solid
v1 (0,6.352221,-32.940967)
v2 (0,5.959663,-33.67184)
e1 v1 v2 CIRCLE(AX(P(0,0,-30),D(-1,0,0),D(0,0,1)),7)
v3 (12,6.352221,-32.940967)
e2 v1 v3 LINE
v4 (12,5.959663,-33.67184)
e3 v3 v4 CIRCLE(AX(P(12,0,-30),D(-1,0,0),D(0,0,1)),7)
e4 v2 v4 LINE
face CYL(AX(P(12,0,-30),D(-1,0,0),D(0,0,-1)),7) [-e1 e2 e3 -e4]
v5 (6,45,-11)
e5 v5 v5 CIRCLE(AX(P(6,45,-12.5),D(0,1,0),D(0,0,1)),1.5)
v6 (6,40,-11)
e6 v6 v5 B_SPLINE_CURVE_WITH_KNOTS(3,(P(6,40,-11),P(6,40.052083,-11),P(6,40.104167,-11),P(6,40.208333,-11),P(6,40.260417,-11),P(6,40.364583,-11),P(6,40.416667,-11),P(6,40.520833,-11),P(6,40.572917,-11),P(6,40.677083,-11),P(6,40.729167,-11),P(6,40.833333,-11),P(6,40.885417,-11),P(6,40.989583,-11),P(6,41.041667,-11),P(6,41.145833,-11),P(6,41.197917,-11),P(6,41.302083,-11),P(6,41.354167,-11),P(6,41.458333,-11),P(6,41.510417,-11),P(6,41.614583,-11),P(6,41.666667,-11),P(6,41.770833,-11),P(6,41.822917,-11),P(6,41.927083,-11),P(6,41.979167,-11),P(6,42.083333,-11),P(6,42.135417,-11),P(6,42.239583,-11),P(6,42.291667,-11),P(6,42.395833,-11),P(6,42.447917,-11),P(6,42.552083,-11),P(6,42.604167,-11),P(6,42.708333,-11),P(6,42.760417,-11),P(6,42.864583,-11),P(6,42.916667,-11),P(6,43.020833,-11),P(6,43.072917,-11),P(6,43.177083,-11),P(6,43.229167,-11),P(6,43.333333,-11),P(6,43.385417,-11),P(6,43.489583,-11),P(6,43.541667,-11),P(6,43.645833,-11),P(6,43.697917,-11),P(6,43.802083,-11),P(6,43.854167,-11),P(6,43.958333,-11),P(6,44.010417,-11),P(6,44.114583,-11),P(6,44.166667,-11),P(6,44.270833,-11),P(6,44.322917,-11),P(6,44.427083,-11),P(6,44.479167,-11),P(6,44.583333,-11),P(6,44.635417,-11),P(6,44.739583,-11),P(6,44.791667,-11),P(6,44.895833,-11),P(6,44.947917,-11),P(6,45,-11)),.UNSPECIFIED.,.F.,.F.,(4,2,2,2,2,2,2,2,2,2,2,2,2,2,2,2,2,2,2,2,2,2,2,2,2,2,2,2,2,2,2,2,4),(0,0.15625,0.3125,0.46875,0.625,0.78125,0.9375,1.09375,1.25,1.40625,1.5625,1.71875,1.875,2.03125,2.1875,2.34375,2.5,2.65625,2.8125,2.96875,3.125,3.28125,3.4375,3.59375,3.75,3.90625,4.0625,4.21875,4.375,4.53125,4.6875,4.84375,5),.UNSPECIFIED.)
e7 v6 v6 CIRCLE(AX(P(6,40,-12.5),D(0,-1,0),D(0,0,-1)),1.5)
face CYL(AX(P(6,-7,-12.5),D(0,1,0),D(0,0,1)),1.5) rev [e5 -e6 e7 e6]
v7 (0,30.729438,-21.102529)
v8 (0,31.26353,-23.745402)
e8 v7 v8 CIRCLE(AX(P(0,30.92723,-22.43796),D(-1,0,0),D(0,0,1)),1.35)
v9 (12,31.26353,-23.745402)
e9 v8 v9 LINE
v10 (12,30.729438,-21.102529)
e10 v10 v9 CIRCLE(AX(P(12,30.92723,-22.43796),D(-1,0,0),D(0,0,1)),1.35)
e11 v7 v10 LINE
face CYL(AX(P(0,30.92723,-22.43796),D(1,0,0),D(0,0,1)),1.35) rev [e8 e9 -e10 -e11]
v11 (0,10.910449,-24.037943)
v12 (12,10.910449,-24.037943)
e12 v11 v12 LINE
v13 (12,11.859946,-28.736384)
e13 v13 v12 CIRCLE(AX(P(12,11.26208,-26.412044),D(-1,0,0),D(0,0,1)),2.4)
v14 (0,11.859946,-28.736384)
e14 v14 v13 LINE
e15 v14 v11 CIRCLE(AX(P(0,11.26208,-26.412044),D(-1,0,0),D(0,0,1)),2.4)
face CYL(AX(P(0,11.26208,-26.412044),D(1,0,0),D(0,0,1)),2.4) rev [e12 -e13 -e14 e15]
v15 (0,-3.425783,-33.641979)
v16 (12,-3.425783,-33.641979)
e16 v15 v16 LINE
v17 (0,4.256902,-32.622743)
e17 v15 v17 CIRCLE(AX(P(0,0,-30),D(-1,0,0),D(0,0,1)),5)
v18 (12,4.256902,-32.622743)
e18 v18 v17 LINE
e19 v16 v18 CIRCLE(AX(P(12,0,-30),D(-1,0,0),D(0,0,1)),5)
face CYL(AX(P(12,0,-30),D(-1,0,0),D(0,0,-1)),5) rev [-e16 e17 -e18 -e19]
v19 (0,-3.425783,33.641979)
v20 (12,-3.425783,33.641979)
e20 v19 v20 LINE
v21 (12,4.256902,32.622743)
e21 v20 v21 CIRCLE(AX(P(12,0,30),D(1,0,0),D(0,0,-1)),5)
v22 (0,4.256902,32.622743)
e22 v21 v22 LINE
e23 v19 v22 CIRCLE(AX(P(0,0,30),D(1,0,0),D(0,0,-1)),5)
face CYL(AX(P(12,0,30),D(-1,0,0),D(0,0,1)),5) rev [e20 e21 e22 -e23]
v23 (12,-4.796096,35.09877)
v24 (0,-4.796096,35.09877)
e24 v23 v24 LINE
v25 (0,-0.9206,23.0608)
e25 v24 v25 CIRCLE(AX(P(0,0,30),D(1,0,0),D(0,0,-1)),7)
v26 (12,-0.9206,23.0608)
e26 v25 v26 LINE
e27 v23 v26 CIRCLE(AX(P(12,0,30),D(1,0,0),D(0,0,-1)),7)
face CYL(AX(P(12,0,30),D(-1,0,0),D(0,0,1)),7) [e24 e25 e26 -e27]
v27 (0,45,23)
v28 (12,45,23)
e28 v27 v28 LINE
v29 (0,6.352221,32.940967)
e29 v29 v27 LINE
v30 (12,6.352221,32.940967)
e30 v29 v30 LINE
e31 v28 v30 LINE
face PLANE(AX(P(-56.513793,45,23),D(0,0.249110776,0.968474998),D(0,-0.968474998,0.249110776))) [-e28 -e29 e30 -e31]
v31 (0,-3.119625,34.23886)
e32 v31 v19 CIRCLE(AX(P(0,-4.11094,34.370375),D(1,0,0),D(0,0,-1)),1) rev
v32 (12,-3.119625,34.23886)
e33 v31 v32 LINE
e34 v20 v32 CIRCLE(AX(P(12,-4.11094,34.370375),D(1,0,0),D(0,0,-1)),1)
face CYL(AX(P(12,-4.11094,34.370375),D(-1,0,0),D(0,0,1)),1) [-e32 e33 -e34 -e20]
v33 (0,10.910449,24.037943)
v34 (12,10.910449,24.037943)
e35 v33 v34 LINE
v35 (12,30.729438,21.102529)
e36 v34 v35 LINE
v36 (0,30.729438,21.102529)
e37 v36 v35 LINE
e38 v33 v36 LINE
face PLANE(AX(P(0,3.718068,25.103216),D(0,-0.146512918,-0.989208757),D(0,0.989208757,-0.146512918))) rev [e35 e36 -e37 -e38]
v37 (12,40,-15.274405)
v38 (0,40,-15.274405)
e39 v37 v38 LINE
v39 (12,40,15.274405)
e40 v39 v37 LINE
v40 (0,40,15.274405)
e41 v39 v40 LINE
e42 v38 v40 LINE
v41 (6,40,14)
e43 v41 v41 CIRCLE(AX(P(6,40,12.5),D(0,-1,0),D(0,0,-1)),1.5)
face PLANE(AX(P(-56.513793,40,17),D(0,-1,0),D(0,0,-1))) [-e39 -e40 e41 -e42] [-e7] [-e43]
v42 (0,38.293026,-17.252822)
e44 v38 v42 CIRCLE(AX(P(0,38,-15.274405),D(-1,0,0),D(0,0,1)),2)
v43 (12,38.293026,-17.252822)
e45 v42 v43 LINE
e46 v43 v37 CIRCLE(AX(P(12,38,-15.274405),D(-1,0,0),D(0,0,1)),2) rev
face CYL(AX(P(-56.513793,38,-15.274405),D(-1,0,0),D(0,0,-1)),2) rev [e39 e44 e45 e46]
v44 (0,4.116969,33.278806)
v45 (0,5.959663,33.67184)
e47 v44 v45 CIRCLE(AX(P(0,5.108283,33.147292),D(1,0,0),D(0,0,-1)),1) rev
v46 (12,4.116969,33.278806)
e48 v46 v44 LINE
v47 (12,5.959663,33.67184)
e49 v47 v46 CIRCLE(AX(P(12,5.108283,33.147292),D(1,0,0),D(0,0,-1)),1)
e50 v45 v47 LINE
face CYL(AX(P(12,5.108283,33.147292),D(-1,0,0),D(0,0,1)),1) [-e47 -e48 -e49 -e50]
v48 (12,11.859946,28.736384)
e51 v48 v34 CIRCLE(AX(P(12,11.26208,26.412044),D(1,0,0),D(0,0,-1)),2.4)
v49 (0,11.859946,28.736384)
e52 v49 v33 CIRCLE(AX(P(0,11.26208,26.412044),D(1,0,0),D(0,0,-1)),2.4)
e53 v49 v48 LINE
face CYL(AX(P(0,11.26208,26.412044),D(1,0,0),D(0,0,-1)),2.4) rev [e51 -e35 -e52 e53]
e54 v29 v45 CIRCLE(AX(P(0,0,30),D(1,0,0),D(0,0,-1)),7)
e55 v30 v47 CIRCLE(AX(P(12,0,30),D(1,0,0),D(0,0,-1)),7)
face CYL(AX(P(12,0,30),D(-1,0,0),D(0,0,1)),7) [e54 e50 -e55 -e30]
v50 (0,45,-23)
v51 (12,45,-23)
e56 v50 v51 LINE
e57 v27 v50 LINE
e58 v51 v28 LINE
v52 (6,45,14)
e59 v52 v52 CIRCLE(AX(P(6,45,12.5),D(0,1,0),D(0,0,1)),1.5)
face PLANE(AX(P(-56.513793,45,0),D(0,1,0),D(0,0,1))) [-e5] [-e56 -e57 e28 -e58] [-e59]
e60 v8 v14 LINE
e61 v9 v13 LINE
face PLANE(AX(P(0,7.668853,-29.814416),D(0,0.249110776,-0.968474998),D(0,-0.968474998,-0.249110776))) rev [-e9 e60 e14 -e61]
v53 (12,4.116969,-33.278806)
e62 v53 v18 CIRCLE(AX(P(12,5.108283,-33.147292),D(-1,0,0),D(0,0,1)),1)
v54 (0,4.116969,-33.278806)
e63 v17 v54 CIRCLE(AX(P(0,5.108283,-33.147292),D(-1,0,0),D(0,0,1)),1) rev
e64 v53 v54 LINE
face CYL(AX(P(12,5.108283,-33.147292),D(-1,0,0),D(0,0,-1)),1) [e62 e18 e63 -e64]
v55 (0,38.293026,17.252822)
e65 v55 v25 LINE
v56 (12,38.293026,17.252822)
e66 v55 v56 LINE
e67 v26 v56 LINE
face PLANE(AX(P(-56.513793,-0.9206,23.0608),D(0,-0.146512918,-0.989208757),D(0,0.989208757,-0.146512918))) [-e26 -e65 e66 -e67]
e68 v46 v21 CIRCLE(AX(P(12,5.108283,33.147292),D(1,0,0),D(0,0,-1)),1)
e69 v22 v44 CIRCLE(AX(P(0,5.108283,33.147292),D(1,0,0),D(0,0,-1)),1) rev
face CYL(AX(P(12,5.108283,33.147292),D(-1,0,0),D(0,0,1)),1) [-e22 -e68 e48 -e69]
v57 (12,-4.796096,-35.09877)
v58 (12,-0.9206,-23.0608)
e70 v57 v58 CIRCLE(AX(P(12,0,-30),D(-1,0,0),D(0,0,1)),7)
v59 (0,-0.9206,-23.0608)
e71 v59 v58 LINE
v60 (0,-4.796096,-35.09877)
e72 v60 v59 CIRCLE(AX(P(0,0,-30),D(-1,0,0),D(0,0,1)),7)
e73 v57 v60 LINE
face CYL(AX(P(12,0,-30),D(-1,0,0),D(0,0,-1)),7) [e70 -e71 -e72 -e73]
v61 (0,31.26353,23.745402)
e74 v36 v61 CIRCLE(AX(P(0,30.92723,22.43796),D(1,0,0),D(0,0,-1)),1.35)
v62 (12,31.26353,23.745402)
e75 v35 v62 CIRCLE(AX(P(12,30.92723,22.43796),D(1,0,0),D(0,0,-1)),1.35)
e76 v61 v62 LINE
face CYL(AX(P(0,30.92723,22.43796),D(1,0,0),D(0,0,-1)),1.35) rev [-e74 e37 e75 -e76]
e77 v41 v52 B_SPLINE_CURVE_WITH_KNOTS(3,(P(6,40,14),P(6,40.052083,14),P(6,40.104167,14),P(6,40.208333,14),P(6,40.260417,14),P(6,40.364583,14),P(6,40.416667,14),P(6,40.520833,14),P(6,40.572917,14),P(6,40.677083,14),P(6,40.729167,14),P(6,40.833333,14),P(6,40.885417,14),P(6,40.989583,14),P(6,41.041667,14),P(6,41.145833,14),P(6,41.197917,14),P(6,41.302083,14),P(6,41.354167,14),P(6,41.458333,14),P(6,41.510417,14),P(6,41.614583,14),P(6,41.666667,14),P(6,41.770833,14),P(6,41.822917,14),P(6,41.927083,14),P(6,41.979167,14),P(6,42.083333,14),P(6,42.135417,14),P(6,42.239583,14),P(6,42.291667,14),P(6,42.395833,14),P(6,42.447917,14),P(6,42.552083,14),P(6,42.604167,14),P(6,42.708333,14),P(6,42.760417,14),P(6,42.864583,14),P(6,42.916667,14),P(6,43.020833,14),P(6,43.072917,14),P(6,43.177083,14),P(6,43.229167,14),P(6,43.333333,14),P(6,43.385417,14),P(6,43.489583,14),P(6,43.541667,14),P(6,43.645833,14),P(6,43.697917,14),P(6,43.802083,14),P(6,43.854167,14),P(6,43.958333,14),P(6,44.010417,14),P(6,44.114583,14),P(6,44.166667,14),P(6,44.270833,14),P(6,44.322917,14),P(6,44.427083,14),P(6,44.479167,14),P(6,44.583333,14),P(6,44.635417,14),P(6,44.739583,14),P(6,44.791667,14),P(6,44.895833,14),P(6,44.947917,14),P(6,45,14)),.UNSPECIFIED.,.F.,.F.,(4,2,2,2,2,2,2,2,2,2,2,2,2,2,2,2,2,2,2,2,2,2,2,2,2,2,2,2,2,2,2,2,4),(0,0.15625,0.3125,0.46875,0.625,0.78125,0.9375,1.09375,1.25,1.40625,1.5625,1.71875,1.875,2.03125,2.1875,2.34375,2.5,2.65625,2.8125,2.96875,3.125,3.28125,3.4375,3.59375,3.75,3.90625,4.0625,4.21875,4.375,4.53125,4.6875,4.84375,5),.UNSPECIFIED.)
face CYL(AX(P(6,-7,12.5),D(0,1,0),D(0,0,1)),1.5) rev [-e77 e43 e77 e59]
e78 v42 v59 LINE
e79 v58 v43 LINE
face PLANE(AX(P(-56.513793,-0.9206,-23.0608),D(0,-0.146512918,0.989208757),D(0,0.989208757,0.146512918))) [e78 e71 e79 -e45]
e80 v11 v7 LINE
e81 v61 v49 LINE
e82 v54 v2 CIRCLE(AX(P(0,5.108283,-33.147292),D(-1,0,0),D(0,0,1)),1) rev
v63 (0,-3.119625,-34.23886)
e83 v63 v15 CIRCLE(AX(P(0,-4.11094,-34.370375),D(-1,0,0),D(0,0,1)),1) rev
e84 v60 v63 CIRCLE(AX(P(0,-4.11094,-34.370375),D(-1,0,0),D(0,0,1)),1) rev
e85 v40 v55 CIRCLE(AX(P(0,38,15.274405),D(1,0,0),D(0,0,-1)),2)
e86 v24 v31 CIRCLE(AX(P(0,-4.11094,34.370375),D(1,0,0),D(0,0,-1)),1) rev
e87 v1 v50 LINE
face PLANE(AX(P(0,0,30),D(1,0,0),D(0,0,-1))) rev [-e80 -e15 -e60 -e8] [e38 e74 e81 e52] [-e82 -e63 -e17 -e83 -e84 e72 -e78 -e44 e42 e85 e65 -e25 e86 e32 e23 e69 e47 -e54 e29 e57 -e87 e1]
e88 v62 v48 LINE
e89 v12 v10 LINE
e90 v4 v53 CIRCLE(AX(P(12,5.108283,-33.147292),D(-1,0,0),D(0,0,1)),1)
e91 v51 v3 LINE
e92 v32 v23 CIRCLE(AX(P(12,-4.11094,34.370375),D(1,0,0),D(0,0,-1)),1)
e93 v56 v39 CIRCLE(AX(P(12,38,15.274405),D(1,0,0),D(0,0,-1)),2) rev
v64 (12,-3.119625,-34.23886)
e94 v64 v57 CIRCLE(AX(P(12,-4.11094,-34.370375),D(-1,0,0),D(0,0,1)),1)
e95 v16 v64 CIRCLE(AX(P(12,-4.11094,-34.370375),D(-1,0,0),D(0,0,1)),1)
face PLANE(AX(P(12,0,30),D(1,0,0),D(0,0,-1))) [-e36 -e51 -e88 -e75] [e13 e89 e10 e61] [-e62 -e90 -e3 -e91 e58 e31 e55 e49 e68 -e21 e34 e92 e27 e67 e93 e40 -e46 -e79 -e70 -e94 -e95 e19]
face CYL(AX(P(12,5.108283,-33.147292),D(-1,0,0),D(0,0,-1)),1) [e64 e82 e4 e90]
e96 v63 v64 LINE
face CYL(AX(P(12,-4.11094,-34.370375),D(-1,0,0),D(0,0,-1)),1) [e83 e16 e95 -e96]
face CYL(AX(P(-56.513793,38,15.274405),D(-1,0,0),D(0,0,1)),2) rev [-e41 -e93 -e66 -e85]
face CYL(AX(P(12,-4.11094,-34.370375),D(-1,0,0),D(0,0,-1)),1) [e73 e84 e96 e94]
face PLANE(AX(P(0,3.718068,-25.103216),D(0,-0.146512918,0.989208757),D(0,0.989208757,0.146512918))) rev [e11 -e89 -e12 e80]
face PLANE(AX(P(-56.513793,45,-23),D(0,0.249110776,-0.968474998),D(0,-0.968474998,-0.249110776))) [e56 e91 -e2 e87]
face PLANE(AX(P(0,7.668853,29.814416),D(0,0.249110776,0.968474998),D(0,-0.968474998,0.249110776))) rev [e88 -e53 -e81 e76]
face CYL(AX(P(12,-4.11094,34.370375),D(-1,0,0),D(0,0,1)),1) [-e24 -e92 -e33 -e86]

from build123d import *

# Parameters (mm, degrees)
SKETCH1_R           = 7
SKETCH1_R_2         = 5
BOSS_EXTRUDE1_DEPTH = 12
CUT_EXTRUDE1_DEPTH  = 40.522145691
FILLET1_R           = 1
BOSS_EXTRUDE2_START = -12
BOSS_EXTRUDE2_DEPTH = 12
FILLET2_R           = 2
CUT_EXTRUDE2_DEPTH  = 59.481408086
SKETCH7_R           = 1.5
CUT_EXTRUDE3_DEPTH  = 65.024019647


with BuildPart() as part:
    # Sketch1 → Boss-Extrude1 (new body)
    with BuildSketch(Plane(origin=(0, 0, 0), x_dir=(0, 0, -1), z_dir=(1, 0, 0))):
        with Locations((-30, 0)):
            Circle(SKETCH1_R)
        with Locations((-30, 0)):
            Circle(SKETCH1_R_2, mode=Mode.SUBTRACT)
    extrude(amount=BOSS_EXTRUDE1_DEPTH)

    # Sketch3 → Cut-Extrude1 (cut, through all)
    with BuildSketch(Plane(origin=(12, 0, 0), x_dir=(0, 0, -1), z_dir=(1, 0, 0))):
        Polygon((-26.132418273, 3.168881756), (-27.092472621, -4.067712446), (-40.54775296, -2.282646151), (-39.587698612, 4.953948051), align=None)
    extrude(amount=-CUT_EXTRUDE1_DEPTH, mode=Mode.SUBTRACT)

    # Fillet1
    fillet1_edges = [part.edges().sort_by_distance(p)[0] for p in [
        (6, 4.067712446, 32.907527379),
        (6, 4.403840469, 35.441156966),
        (6, -3.168881756, 33.867581727),
        (6, -2.832753733, 36.401211314),
    ]]
    fillet(fillet1_edges, radius=FILLET1_R - 0.0001)  # a hair under: the kernel refuses the full size

    # Sketch4 → Boss-Extrude2 (add)
    with BuildSketch(Plane(origin=(12, 0, 0), x_dir=(0, 0, -1), z_dir=(1, 0, 0)).offset(BOSS_EXTRUDE2_START)):
        with BuildLine():
            Line((-23.06080008, -0.92060006), (-17, 40))
            Line((-17, 40), (0, 40))
            Line((0, 40), (0, 45))
            Line((0, 45), (-23, 45))
            Line((-23, 45), (-32.940967226, 6.352221011))
            ThreePointArc((-32.940967226, 6.352221011), (-25.850307511, 5.63737991), (-23.06080008, -0.92060006))
        make_face()
    extrude(amount=BOSS_EXTRUDE2_DEPTH)

    # Fillet2
    fillet2_edges = [part.edges().sort_by_distance(p)[0] for p in [
        (6, 40, 17),
    ]]
    fillet(fillet2_edges, radius=FILLET2_R)

    # Sketch6 → Cut-Extrude2 (cut, through all)
    with BuildSketch(Plane(origin=(12, 0, 0), x_dir=(0, 0, -1), z_dir=(1, 0, 0))):
        with BuildLine():
            Line((-24.037943225, 10.910448491), (-21.102528553, 30.729437441))
            ThreePointArc((-21.102528553, 30.729437441), (-22.170547869, 32.250479964), (-23.74540162, 31.263529469))
            Line((-23.74540162, 31.263529469), (-28.73638424, 11.859945407))
            ThreePointArc((-28.73638424, 11.859945407), (-26.887444194, 8.909635204), (-24.037943225, 10.910448491))
        make_face()
    extrude(amount=-CUT_EXTRUDE2_DEPTH, mode=Mode.SUBTRACT)

    # Mirror9: part across plane


with BuildPart() as part_1:
    add(part.part)
    add(part.part.mirror(Plane(origin=(-56.513793287, 40, 0), x_dir=(1, 0, 0), z_dir=(0, 0, -1))))

    # Sketch7 → Cut-Extrude3 (cut, through all)
    with BuildSketch(Plane(origin=(0, 45, 0), x_dir=(1, 0, 0), z_dir=(0, 1, 0))):
        with Locations(Location((6, -12.5, 0), (0, 0, 270))):
            Circle(SKETCH7_R)
        with Locations(Location((6, 12.5, 0), (0, 0, 270))):
            Circle(SKETCH7_R)
    extrude(amount=-CUT_EXTRUDE3_DEPTH, mode=Mode.SUBTRACT)


solid = part_1.part
